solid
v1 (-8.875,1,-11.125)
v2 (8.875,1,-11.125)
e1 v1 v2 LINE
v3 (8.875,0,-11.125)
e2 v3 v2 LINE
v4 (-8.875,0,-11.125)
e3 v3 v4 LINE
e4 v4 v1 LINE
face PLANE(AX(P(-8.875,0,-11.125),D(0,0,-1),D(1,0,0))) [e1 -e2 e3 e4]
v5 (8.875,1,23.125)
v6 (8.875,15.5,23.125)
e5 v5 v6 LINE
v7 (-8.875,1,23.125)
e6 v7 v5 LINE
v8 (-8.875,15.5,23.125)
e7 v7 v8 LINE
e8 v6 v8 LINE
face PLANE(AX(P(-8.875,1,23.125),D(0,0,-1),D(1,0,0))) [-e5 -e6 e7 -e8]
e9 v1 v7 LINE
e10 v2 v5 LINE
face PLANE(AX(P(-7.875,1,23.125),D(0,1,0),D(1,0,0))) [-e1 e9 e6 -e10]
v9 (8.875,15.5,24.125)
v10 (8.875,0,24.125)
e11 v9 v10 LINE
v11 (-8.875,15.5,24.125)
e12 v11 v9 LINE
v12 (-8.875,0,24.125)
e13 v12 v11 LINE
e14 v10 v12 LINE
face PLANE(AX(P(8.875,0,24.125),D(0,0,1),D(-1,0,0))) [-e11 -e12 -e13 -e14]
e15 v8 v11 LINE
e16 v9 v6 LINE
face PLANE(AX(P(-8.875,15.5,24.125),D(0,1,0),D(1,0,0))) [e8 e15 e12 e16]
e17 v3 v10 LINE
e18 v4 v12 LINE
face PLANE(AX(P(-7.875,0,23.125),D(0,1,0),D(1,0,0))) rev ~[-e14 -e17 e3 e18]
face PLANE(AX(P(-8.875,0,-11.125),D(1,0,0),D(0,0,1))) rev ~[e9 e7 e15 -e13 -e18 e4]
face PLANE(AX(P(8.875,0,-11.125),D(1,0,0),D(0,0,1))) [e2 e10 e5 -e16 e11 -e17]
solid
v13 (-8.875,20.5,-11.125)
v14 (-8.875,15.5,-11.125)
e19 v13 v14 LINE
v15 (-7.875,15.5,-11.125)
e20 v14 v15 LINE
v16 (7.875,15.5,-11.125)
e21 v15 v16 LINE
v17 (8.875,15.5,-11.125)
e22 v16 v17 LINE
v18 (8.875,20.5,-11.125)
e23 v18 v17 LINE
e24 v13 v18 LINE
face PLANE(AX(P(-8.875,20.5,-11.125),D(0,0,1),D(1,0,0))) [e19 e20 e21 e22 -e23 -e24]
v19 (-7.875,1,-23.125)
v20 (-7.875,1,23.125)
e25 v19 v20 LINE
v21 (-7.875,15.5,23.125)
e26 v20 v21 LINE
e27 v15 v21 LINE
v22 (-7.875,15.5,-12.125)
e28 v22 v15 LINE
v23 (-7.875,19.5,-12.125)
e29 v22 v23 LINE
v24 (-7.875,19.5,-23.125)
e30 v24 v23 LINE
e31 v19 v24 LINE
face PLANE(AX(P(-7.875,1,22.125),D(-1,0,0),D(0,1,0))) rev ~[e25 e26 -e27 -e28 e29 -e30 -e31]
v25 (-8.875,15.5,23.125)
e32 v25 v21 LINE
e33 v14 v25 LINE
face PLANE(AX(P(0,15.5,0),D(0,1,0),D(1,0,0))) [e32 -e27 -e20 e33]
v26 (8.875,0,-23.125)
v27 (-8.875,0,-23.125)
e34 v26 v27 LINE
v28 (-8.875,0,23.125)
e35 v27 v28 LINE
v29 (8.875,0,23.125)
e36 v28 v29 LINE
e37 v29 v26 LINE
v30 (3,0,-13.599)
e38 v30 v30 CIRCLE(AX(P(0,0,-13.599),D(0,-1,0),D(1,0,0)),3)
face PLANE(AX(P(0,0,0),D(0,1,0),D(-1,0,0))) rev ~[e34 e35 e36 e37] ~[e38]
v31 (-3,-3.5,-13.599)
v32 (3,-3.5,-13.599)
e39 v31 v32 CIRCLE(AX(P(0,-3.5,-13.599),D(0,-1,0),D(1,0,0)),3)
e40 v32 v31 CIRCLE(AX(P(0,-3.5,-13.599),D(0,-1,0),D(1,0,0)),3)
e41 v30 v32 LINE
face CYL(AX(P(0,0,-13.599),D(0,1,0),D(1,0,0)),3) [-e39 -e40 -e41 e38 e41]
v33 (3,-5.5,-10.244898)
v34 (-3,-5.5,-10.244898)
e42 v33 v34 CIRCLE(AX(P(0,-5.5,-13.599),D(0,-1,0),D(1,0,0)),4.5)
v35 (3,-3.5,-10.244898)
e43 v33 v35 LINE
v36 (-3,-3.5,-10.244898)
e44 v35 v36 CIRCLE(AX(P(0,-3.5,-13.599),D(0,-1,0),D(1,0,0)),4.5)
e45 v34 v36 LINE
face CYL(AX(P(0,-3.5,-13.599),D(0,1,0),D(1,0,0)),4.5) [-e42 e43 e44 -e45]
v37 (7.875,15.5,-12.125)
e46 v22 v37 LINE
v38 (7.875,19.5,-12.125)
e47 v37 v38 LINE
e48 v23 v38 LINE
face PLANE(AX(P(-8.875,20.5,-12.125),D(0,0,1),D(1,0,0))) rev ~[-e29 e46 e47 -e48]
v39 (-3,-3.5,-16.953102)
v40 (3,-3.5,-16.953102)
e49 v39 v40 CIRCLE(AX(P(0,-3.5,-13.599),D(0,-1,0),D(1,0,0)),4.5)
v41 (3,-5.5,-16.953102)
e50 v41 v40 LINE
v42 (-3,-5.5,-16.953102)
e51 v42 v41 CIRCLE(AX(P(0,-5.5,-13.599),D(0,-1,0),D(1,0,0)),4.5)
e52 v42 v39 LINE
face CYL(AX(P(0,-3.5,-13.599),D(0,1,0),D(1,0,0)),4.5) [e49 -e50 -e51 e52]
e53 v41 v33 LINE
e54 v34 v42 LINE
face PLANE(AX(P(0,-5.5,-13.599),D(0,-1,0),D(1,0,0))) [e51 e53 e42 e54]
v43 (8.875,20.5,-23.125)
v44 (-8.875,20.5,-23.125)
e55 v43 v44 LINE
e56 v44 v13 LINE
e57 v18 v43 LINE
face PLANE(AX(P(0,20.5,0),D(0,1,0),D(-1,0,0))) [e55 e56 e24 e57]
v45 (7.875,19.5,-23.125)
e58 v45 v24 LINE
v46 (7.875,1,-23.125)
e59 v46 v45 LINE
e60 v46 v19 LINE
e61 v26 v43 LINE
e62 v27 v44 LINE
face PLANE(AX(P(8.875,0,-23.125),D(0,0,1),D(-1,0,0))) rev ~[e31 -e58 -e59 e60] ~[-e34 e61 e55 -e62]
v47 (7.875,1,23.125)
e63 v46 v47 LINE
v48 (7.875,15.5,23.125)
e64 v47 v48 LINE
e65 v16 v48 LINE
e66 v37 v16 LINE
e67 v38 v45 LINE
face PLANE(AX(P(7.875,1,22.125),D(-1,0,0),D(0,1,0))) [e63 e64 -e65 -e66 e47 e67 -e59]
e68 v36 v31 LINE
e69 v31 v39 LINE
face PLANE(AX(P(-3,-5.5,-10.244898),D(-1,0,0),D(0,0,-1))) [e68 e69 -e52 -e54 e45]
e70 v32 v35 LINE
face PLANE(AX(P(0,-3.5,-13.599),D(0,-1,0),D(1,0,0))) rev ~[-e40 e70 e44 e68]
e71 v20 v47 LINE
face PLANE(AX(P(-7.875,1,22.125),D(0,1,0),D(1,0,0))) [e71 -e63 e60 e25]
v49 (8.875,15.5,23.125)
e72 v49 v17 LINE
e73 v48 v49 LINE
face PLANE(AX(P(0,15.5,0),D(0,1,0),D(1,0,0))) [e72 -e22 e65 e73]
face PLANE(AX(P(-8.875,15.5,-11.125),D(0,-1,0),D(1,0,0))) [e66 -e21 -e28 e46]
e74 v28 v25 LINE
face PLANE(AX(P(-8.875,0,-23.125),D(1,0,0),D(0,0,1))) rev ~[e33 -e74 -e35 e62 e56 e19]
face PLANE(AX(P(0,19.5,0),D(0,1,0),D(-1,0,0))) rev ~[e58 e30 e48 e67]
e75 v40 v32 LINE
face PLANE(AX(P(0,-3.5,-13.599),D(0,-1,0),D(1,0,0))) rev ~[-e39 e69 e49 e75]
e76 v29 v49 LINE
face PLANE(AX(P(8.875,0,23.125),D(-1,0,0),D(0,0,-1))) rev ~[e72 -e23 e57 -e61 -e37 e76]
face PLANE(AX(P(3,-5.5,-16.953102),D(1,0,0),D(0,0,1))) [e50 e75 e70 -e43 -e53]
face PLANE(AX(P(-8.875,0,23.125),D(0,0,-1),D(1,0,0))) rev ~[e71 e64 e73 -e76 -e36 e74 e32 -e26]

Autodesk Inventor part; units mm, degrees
ref_plane "YZ Plane" through (0, 0, 0) normal (1, 0, 0) x (0, 1, 0)
ref_plane "XZ Plane" through (0, 0, 0) normal (0, 1, 0) x (-1, 0, 0)
ref_plane "XY Plane" through (0, 0, 0) normal (0, 0, 1) x (1, 0, 0)
sketch "Sketch1" plane through (0, 0, 0) normal (0, 1, 0) x (-1, 0, 0)
  line L0 (-8.875, -23.125) -> (8.875, -23.125)
  line L1 (8.875, -23.125) -> (8.875, 23.125)
  line L2 (8.875, 23.125) -> (-8.875, 23.125)
  line L3 (-8.875, 23.125) -> (-8.875, -23.125)
  line L4 (-8.875, -23.125) -> (8.875, 23.125) construction
  line L5 (8.875, -23.125) -> (-8.875, 23.125) construction
  point P0 (0, 0)
  dimension "d0" = 17.75
  dimension "d1" = 46.25
extrude "Extrusion1" add sketch "Sketch1" along normal blind 20.5
sketch "Sketch2" plane through (0, 20.5, 0) normal (0, 1, 0) x (1, 0, 0)
  line L0 (-8.875, 23.125) -> (-8.875, -23.125) projected
  line L1 (-8.875, -23.125) -> (8.875, -23.125) projected
  line L2 (8.875, -23.125) -> (8.875, 23.125) projected
  line L3 (8.875, 23.125) -> (-8.875, 23.125) projected
  line L4 (-8.875, 11.125) -> (8.875, 11.125)
  point P0 (0, 0)
  dimension "d4" = 12
extrude "Extrusion2" cut sketch "Sketch2" against normal blind 5 contours L4 L2 L1 L0
shell "Shell1" thickness 1 removed faces 1 at (-2.9583, 15.5, 0.2917)
shell "Shell2" thickness 1 removed faces 2 at (2.9583, 13.6667, -23.125) at (2.625, 13.3333, -22.125)
sketch "Sketch3" plane through (-8.875, 0, 23.125) normal (0, 0, 1) x (1, 0, 0)
  line L0 (17.75, 0) -> (17.75, 15.5) projected
  line L1 (0, 7) -> (18, 7)
  line L2 (1, 15.5) -> (16.75, 15.5) projected
  line L3 (8.875, 15.5) -> (8.875, 0)
  point P0 (8.875, 7)
hole "Hole1" at (0, 7, 23.125) direction (0, 0, -1) diameter 7 depth 8 tip angle 118
sketch "Sketch4" plane through (0, 0, 0) normal (0, -1, 0) x (1, 0, 0)
  circle A0 centre (0, -13.599) radius 3
  point P0 (0, 0)
  dimension "d16" = 6
extrude "Extrusion3" add sketch "Sketch4" along normal blind 3.5
sketch "Sketch5" plane through (0, -3.5, -13.599) normal (0, -1, 0) x (1, 0, 0)
  circle A0 centre (0, 0) radius 3 projected
  circle A1 centre (0, 0) radius 4.5
  point P0 (0, 13.599)
  dimension "d19" = 9
extrude "Extrusion4" add sketch "Sketch5" along normal blind 2 contours A0 | A1
sketch "Sketch6" plane through (0, -5.5, -13.599) normal (0, -1, 0) x (1, 0, 0)
  circle A0 centre (0, 0) radius 4.5 projected
  line L0 (-3, -4.5) -> (3, -4.5)
  line L1 (3, -4.5) -> (3, 4.5)
  line L2 (3, 4.5) -> (-3, 4.5)
  line L3 (-3, 4.5) -> (-3, -4.5)
  line L4 (-3, -4.5) -> (3, 4.5) construction
  line L5 (3, -4.5) -> (-3, 4.5) construction
  point P0 (0, 13.599)
  point P1 (3, 3.3541)
  point P2 (3, -3.3541)
  point P3 (-3, -3.3541)
  point P4 (-3, 3.3541)
  dimension "d22" = 6
extrude "Extrusion5" cut sketch "Sketch6" against normal blind 2 contours A0 L1 | L3 A0
sketch "Sketch7" plane through (7.875, 15.5, 22.125) normal (0, 0, -1) x (-1, 0, 0)
  circle A0 centre (7.875, -8.5) radius 3.5 projected
  line L0 (0, 0) -> (15.75, 0) projected
  line L1 (0, -14.5) -> (0, 0) projected
  line L2 (15.75, -14.5) -> (0, -14.5) projected
  line L3 (15.75, -14.5) -> (15.75, 0) projected
  point P0 (7.875, -15.5)
extrude "Extrusion6" cut sketch "Sketch7" against normal blind 2
sketch "Sketch8" plane through (-7.875, 1, 23.125) normal (0, 1, 0) x (1, 0, 0)
  line L0 (15.75, 0) -> (0, 0) projected
  line L1 (0, 34.25) -> (0, 35.25) projected
  line L2 (-1, 46.25) -> (-1, 0) projected
  line L3 (16.75, -1) -> (-1, -1)
  line L4 (-1, -1) -> (-1, 34.25)
  line L5 (-1, 34.25) -> (16.75, 34.25)
  line L6 (16.75, 34.25) -> (16.75, -1)
  point P0 (7.875, 23.125)
  dimension "d27" = 1
extrude "Extrusion7" add sketch "Sketch8" along normal blind 1 separate body
sketch "Sketch9" plane through (-7.875, 2, 23.125) normal (0, 1, 0) x (1, 0, 0)
  line L0 (16.75, -1) -> (16.75, 34.25) projected
  line L1 (-1, 34.25) -> (-1, -1) projected
  line L2 (-1, -1) -> (16.75, -1) projected
  line L3 (16.75, -1) -> (-1, -1)
  line L4 (-1, -1) -> (-1, 0)
  line L5 (-1, 0) -> (16.75, 0)
  line L6 (16.75, 0) -> (16.75, -1)
  point P0 (7.875, 23.125)
  point P1 (-1, 0)
extrude "Extrusion8" add sketch "Sketch9" along normal blind 15 bodies 2
move or copy body "Move Body1" bodies to move or copy 2 copy no translate (0, -1, 0)
sketch "Sketch10" plane through (-8.875, 16, 24.125) normal (0, 1, 0) x (1, 0, 0)
  line L0 (0, 0) -> (17.75, 0) projected
  line L1 (17.75, 0) -> (17.75, 1) projected
  line L2 (17.75, 1) -> (0, 1) projected
  line L3 (0, 1) -> (0, 0) projected
  point P0 (8.875, 24.125)
extrude "Extrusion9" cut sketch "Sketch10" against normal blind 0.5 bodies 2
properties part number "charger2"
